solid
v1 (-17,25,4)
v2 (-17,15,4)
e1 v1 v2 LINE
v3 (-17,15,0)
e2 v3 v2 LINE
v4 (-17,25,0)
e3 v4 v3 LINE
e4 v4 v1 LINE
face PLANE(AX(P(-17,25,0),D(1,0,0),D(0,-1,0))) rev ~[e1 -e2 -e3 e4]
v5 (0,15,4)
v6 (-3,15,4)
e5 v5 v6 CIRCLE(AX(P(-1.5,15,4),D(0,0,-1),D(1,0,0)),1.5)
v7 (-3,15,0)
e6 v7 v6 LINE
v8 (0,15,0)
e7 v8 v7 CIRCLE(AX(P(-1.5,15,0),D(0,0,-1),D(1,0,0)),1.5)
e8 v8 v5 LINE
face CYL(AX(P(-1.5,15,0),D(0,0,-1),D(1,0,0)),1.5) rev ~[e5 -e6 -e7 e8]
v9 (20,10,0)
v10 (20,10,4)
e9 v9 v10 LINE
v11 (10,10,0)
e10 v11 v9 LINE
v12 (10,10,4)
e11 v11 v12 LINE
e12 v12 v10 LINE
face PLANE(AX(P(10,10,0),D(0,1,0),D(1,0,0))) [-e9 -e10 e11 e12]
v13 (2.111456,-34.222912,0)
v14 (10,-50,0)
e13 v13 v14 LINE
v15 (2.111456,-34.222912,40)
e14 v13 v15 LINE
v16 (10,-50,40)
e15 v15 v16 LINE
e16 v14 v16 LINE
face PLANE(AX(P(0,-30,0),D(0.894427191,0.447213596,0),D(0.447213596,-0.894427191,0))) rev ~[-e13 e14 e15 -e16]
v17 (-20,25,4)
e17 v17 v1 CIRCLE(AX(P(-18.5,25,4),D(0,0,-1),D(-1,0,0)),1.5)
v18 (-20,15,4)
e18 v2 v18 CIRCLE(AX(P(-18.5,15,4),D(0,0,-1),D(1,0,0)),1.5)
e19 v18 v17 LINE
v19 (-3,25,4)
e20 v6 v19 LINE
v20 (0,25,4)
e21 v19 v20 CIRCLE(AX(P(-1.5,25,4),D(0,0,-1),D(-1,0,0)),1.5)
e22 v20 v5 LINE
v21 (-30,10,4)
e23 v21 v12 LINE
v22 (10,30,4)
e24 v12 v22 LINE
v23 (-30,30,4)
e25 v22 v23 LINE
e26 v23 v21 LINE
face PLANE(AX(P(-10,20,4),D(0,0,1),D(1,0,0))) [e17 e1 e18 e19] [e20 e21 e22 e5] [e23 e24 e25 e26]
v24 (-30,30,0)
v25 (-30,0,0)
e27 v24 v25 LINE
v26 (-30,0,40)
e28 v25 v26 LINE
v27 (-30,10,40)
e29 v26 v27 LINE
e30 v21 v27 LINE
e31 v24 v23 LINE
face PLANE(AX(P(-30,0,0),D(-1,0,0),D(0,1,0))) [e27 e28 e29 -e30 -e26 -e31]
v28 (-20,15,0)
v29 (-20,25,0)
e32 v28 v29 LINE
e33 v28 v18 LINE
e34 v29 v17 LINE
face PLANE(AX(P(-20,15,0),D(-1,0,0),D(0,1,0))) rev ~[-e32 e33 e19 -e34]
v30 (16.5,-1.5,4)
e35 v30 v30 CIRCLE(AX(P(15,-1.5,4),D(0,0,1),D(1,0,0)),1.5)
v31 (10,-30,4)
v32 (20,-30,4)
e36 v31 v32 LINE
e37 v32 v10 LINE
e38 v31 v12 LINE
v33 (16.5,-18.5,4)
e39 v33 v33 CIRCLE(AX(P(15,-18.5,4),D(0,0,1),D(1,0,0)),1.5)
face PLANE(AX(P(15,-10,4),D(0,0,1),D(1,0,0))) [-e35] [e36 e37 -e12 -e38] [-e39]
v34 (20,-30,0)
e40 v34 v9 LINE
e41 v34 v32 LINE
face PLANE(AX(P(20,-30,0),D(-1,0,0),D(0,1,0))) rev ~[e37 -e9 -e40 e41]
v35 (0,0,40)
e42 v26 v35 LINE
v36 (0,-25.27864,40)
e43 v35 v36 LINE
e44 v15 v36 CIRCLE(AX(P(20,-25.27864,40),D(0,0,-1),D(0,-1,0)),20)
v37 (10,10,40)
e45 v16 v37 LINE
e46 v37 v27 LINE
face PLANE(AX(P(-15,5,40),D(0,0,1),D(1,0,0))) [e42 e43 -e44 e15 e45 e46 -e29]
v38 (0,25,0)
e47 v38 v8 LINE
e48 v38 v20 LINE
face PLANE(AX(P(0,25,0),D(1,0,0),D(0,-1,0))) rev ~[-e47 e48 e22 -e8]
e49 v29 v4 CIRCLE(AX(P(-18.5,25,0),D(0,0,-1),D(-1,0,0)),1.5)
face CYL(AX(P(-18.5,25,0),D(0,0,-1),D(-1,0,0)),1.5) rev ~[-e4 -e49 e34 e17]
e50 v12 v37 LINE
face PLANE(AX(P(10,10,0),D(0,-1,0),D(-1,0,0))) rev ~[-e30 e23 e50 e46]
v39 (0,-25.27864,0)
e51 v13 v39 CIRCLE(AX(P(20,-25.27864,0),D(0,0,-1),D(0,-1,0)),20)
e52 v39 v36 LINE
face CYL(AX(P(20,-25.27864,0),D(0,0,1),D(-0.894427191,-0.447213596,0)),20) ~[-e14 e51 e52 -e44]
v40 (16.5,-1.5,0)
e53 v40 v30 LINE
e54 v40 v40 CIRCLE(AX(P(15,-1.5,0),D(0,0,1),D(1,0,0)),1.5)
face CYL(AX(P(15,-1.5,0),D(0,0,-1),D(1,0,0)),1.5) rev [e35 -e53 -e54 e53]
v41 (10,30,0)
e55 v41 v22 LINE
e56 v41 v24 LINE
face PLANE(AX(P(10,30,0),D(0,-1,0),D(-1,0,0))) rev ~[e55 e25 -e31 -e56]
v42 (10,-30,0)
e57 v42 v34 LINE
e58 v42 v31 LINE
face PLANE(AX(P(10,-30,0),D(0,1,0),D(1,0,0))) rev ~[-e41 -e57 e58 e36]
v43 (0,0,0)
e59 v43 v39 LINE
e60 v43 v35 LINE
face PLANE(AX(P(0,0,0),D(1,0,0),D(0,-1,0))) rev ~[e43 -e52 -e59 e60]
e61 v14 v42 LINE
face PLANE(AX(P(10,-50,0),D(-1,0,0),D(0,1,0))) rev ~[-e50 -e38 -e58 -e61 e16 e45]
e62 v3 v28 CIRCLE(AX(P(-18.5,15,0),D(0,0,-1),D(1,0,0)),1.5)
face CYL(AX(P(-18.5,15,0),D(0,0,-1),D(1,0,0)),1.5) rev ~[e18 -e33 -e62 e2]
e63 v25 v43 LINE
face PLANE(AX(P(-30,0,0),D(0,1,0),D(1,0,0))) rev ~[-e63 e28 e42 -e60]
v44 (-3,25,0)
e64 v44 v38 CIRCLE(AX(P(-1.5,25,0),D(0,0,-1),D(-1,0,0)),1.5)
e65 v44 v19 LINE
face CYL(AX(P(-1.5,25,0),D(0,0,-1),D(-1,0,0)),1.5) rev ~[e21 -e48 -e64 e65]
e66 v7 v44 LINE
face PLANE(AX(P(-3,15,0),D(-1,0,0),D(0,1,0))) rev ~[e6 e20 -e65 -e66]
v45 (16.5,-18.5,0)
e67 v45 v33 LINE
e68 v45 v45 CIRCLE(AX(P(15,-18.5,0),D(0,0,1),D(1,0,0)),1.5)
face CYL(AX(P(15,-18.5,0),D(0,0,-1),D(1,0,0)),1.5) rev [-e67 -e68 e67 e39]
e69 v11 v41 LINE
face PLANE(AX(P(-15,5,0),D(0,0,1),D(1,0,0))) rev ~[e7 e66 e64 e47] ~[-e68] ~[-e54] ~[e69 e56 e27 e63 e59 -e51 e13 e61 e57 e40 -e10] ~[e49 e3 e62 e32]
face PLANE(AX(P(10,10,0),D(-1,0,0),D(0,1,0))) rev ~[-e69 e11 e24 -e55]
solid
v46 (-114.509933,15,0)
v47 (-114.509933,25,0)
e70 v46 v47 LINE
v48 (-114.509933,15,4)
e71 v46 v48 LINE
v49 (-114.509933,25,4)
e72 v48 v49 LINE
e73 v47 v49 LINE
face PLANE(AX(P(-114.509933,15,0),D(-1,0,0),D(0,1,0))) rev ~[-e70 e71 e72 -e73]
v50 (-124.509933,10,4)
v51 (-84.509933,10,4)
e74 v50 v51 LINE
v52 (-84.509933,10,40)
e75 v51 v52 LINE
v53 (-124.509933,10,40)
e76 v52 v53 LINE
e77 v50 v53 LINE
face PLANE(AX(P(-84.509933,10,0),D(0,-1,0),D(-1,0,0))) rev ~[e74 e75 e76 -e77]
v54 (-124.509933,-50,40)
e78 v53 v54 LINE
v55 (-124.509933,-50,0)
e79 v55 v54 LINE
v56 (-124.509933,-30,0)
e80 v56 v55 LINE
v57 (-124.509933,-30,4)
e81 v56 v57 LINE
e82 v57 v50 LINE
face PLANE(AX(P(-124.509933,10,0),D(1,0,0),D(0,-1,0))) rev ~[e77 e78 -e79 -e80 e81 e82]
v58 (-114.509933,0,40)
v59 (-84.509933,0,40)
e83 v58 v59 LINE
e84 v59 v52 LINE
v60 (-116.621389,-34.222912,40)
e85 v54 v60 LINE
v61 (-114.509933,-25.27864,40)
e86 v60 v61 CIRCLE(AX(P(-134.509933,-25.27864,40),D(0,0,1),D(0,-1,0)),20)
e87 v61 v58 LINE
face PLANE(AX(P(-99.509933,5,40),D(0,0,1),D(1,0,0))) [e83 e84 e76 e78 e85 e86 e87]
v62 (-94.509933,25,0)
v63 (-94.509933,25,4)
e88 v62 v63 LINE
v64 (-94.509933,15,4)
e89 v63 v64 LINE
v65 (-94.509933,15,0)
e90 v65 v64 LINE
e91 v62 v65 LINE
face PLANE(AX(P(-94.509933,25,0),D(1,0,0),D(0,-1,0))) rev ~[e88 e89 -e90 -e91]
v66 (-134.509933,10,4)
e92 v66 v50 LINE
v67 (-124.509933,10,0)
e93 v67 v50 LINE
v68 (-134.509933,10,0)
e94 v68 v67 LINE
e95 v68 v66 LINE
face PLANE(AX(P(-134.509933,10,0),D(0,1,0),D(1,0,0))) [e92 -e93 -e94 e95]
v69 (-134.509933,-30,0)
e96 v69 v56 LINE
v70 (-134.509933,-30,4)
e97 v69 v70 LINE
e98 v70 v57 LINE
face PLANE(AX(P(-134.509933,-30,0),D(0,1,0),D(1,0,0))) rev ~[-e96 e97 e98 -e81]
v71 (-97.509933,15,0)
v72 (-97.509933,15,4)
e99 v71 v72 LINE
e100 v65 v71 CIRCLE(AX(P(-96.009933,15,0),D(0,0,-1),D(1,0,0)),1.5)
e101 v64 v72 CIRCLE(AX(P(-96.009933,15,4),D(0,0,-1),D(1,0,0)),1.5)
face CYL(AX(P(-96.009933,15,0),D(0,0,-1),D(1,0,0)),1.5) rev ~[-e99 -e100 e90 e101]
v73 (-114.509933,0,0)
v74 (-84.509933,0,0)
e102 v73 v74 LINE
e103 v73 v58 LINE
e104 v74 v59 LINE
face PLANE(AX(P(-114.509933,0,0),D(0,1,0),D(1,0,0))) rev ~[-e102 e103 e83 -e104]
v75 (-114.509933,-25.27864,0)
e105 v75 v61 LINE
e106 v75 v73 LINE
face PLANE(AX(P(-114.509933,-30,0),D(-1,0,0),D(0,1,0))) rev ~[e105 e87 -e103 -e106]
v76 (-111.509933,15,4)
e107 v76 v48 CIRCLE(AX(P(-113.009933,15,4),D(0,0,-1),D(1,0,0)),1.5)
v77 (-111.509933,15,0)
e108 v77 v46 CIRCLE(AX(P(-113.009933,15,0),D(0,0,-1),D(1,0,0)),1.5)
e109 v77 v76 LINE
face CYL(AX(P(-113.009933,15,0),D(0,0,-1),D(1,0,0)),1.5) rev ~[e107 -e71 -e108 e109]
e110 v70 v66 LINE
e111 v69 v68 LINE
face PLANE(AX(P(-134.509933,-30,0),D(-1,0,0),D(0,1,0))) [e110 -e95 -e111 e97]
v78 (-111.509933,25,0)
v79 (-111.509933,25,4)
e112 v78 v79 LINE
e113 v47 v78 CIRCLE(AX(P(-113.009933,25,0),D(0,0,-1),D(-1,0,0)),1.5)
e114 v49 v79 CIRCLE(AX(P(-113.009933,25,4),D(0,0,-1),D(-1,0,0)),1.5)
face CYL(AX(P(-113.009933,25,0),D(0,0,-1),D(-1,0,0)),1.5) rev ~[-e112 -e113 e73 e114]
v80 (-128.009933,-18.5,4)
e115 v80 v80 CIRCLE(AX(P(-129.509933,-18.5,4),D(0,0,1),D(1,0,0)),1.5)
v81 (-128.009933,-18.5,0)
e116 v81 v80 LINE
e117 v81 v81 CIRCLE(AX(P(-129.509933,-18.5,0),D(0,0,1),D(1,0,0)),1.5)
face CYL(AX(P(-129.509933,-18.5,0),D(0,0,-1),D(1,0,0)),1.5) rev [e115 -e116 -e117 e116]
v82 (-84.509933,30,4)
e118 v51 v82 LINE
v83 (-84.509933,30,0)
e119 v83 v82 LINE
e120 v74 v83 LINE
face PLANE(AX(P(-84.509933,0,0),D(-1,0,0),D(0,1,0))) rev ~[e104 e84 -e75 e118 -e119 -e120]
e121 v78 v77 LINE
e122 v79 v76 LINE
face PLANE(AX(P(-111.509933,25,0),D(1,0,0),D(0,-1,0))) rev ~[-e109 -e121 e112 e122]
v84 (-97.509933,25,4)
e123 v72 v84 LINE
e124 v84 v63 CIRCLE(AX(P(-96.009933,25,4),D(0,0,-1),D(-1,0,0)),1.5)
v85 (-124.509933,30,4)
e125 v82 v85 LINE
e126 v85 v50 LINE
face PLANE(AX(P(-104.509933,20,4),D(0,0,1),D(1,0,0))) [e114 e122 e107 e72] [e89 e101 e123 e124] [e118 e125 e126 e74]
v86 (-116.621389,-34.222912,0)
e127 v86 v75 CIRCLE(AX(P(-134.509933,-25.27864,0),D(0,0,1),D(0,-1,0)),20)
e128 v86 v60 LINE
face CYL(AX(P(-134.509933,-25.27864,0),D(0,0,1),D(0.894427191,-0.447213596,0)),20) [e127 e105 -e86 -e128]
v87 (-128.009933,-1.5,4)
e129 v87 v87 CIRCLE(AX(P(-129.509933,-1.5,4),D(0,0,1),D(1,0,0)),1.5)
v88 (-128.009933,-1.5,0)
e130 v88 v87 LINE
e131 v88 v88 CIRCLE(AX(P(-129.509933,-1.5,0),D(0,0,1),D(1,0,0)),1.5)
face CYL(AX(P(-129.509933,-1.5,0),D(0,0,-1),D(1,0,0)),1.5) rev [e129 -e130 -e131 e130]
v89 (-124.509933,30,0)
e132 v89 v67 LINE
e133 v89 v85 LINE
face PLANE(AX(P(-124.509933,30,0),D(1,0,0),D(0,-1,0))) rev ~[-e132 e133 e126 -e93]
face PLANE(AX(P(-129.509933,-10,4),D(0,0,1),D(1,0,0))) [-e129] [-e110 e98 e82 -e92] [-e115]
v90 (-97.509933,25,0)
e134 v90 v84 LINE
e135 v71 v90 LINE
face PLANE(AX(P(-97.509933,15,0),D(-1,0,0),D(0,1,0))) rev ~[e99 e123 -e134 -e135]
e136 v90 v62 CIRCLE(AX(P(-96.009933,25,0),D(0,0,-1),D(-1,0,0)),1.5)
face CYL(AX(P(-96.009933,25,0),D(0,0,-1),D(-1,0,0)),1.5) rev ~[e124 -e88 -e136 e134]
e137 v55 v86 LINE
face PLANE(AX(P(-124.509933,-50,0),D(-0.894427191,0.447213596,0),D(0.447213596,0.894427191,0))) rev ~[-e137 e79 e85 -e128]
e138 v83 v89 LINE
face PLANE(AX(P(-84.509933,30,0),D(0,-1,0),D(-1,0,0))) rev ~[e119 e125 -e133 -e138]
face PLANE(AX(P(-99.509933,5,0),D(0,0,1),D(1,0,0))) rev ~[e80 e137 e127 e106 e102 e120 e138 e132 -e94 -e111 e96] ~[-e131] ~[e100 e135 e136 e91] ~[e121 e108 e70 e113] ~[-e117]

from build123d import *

# Parameters (mm, degrees)
F1_DEPTH = 4
F0_W     = 10
F0_H     = 40
F0_R     = 1.5
F0_W_2   = 30
F0_H_2   = 10
F2_DEPTH = 40
F3_R     = 20
F3_2_R   = 20


# Not quite as in the source:
# - a feature names something its author has since deleted; it is built from what else it names


with BuildPart() as f1:
    # F0 (on Top) → F1 (new body)
    with BuildSketch(Plane.XY):
        Polygon((-30, 30), (-30, 10), (0, 10), (10, 10), (10, 30), align=None)
        with BuildLine():
            Line((-20, 15), (-20, 25))
            ThreePointArc((-20, 25), (-18.5, 26.5), (-17, 25))
            Line((-17, 25), (-17, 15))
            ThreePointArc((-17, 15), (-18.5, 13.5), (-20, 15))
        make_face(mode=Mode.SUBTRACT)
        with BuildLine():
            Line((-3, 15), (-3, 25))
            ThreePointArc((-3, 25), (-1.5, 26.5), (0, 25))
            Line((0, 25), (0, 15))
            ThreePointArc((0, 15), (-1.5, 13.5), (-3, 15))
        make_face(mode=Mode.SUBTRACT)
    extrude(amount=F1_DEPTH)



with BuildPart() as f1b:
    # F0 (on Top) → F1, piece 2 (new body)
    with BuildSketch(Plane.XY):
        with Locations((15, -10)):
            Rectangle(F0_W, F0_H)
        with Locations((15, -18.5)):
            Circle(F0_R, mode=Mode.SUBTRACT)
        with Locations((15, -1.5)):
            Circle(F0_R, mode=Mode.SUBTRACT)
    extrude(amount=F1_DEPTH)


with BuildPart() as f1c:
    # F0 (on Top) → F1, piece 3 (new body)
    with BuildSketch(Plane.XY):
        Polygon((-84.5099326968, 30), (-124.5099326968, 30), (-124.5099326968, 10), (-114.5099326968, 10), (-84.5099326968, 10), align=None)
        with BuildLine():
            Line((-111.5099326968, 25), (-111.5099326968, 15))
            ThreePointArc((-111.5099326968, 15), (-113.0099326968, 13.5), (-114.5099326968, 15))
            Line((-114.5099326968, 15), (-114.5099326968, 25))
            ThreePointArc((-114.5099326968, 25), (-113.0099326968, 26.5), (-111.5099326968, 25))
        make_face(mode=Mode.SUBTRACT)
        with BuildLine():
            Line((-97.5099326968, 15), (-97.5099326968, 25))
            ThreePointArc((-97.5099326968, 25), (-96.0099326968, 26.5), (-94.5099326968, 25))
            Line((-94.5099326968, 25), (-94.5099326968, 15))
            ThreePointArc((-94.5099326968, 15), (-96.0099326968, 13.5), (-97.5099326968, 15))
        make_face(mode=Mode.SUBTRACT)
    extrude(amount=F1_DEPTH)



with BuildPart() as f1d:
    # F0 (on Top) → F1, piece 4 (new body)
    with BuildSketch(Plane.XY):
        with Locations((-129.5099326968, -10)):
            Rectangle(F0_W, F0_H)
        with Locations((-129.5099326968, -18.5)):
            Circle(F0_R, mode=Mode.SUBTRACT)
        with Locations((-129.5099326968, -1.5)):
            Circle(F0_R, mode=Mode.SUBTRACT)
    extrude(amount=F1_DEPTH)


with BuildPart() as f1_1:
    add(f1.part)

    add(f1b.part)  # F2 merges F1b
    # F0 (on Top) → F2 (join)
    with BuildSketch(Plane.XY):
        with Locations((-15, 5)):
            Rectangle(F0_W_2, F0_H_2)
        Polygon((10, 10), (0, 10), (0, 0), (0, -30), (10, -30), align=None)
        Polygon((10, -30), (0, -30), (10, -50), align=None)
    extrude(amount=F2_DEPTH)

    # F3
    f3_edges = [f1_1.edges().sort_by_distance(p)[0] for p in [
        (0, -30, 20),
    ]]
    fillet(f3_edges, radius=F3_R)


with BuildPart() as f1c_1:
    add(f1c.part)

    add(f1d.part)  # F2#2 merges F1d
    # F0 (on Top) → F2, piece 2 (join)
    with BuildSketch(Plane.XY):
        with Locations((-99.5099326968, 5)):
            Rectangle(F0_W_2, F0_H_2)
        Polygon((-114.5099326968, 10), (-124.5099326968, 10), (-124.5099326968, -30), (-114.5099326968, -30), (-114.5099326968, 0), align=None)
        Polygon((-114.5099326968, -30), (-124.5099326968, -30), (-124.5099326968, -50), align=None)
    extrude(amount=F2_DEPTH)

    # F3#2
    f3_2_edges = [f1c_1.edges().sort_by_distance(p)[0] for p in [
        (-114.509933, -30, 20),
    ]]
    fillet(f3_2_edges, radius=F3_2_R)


solid = Compound([f1_1.part, f1c_1.part])
